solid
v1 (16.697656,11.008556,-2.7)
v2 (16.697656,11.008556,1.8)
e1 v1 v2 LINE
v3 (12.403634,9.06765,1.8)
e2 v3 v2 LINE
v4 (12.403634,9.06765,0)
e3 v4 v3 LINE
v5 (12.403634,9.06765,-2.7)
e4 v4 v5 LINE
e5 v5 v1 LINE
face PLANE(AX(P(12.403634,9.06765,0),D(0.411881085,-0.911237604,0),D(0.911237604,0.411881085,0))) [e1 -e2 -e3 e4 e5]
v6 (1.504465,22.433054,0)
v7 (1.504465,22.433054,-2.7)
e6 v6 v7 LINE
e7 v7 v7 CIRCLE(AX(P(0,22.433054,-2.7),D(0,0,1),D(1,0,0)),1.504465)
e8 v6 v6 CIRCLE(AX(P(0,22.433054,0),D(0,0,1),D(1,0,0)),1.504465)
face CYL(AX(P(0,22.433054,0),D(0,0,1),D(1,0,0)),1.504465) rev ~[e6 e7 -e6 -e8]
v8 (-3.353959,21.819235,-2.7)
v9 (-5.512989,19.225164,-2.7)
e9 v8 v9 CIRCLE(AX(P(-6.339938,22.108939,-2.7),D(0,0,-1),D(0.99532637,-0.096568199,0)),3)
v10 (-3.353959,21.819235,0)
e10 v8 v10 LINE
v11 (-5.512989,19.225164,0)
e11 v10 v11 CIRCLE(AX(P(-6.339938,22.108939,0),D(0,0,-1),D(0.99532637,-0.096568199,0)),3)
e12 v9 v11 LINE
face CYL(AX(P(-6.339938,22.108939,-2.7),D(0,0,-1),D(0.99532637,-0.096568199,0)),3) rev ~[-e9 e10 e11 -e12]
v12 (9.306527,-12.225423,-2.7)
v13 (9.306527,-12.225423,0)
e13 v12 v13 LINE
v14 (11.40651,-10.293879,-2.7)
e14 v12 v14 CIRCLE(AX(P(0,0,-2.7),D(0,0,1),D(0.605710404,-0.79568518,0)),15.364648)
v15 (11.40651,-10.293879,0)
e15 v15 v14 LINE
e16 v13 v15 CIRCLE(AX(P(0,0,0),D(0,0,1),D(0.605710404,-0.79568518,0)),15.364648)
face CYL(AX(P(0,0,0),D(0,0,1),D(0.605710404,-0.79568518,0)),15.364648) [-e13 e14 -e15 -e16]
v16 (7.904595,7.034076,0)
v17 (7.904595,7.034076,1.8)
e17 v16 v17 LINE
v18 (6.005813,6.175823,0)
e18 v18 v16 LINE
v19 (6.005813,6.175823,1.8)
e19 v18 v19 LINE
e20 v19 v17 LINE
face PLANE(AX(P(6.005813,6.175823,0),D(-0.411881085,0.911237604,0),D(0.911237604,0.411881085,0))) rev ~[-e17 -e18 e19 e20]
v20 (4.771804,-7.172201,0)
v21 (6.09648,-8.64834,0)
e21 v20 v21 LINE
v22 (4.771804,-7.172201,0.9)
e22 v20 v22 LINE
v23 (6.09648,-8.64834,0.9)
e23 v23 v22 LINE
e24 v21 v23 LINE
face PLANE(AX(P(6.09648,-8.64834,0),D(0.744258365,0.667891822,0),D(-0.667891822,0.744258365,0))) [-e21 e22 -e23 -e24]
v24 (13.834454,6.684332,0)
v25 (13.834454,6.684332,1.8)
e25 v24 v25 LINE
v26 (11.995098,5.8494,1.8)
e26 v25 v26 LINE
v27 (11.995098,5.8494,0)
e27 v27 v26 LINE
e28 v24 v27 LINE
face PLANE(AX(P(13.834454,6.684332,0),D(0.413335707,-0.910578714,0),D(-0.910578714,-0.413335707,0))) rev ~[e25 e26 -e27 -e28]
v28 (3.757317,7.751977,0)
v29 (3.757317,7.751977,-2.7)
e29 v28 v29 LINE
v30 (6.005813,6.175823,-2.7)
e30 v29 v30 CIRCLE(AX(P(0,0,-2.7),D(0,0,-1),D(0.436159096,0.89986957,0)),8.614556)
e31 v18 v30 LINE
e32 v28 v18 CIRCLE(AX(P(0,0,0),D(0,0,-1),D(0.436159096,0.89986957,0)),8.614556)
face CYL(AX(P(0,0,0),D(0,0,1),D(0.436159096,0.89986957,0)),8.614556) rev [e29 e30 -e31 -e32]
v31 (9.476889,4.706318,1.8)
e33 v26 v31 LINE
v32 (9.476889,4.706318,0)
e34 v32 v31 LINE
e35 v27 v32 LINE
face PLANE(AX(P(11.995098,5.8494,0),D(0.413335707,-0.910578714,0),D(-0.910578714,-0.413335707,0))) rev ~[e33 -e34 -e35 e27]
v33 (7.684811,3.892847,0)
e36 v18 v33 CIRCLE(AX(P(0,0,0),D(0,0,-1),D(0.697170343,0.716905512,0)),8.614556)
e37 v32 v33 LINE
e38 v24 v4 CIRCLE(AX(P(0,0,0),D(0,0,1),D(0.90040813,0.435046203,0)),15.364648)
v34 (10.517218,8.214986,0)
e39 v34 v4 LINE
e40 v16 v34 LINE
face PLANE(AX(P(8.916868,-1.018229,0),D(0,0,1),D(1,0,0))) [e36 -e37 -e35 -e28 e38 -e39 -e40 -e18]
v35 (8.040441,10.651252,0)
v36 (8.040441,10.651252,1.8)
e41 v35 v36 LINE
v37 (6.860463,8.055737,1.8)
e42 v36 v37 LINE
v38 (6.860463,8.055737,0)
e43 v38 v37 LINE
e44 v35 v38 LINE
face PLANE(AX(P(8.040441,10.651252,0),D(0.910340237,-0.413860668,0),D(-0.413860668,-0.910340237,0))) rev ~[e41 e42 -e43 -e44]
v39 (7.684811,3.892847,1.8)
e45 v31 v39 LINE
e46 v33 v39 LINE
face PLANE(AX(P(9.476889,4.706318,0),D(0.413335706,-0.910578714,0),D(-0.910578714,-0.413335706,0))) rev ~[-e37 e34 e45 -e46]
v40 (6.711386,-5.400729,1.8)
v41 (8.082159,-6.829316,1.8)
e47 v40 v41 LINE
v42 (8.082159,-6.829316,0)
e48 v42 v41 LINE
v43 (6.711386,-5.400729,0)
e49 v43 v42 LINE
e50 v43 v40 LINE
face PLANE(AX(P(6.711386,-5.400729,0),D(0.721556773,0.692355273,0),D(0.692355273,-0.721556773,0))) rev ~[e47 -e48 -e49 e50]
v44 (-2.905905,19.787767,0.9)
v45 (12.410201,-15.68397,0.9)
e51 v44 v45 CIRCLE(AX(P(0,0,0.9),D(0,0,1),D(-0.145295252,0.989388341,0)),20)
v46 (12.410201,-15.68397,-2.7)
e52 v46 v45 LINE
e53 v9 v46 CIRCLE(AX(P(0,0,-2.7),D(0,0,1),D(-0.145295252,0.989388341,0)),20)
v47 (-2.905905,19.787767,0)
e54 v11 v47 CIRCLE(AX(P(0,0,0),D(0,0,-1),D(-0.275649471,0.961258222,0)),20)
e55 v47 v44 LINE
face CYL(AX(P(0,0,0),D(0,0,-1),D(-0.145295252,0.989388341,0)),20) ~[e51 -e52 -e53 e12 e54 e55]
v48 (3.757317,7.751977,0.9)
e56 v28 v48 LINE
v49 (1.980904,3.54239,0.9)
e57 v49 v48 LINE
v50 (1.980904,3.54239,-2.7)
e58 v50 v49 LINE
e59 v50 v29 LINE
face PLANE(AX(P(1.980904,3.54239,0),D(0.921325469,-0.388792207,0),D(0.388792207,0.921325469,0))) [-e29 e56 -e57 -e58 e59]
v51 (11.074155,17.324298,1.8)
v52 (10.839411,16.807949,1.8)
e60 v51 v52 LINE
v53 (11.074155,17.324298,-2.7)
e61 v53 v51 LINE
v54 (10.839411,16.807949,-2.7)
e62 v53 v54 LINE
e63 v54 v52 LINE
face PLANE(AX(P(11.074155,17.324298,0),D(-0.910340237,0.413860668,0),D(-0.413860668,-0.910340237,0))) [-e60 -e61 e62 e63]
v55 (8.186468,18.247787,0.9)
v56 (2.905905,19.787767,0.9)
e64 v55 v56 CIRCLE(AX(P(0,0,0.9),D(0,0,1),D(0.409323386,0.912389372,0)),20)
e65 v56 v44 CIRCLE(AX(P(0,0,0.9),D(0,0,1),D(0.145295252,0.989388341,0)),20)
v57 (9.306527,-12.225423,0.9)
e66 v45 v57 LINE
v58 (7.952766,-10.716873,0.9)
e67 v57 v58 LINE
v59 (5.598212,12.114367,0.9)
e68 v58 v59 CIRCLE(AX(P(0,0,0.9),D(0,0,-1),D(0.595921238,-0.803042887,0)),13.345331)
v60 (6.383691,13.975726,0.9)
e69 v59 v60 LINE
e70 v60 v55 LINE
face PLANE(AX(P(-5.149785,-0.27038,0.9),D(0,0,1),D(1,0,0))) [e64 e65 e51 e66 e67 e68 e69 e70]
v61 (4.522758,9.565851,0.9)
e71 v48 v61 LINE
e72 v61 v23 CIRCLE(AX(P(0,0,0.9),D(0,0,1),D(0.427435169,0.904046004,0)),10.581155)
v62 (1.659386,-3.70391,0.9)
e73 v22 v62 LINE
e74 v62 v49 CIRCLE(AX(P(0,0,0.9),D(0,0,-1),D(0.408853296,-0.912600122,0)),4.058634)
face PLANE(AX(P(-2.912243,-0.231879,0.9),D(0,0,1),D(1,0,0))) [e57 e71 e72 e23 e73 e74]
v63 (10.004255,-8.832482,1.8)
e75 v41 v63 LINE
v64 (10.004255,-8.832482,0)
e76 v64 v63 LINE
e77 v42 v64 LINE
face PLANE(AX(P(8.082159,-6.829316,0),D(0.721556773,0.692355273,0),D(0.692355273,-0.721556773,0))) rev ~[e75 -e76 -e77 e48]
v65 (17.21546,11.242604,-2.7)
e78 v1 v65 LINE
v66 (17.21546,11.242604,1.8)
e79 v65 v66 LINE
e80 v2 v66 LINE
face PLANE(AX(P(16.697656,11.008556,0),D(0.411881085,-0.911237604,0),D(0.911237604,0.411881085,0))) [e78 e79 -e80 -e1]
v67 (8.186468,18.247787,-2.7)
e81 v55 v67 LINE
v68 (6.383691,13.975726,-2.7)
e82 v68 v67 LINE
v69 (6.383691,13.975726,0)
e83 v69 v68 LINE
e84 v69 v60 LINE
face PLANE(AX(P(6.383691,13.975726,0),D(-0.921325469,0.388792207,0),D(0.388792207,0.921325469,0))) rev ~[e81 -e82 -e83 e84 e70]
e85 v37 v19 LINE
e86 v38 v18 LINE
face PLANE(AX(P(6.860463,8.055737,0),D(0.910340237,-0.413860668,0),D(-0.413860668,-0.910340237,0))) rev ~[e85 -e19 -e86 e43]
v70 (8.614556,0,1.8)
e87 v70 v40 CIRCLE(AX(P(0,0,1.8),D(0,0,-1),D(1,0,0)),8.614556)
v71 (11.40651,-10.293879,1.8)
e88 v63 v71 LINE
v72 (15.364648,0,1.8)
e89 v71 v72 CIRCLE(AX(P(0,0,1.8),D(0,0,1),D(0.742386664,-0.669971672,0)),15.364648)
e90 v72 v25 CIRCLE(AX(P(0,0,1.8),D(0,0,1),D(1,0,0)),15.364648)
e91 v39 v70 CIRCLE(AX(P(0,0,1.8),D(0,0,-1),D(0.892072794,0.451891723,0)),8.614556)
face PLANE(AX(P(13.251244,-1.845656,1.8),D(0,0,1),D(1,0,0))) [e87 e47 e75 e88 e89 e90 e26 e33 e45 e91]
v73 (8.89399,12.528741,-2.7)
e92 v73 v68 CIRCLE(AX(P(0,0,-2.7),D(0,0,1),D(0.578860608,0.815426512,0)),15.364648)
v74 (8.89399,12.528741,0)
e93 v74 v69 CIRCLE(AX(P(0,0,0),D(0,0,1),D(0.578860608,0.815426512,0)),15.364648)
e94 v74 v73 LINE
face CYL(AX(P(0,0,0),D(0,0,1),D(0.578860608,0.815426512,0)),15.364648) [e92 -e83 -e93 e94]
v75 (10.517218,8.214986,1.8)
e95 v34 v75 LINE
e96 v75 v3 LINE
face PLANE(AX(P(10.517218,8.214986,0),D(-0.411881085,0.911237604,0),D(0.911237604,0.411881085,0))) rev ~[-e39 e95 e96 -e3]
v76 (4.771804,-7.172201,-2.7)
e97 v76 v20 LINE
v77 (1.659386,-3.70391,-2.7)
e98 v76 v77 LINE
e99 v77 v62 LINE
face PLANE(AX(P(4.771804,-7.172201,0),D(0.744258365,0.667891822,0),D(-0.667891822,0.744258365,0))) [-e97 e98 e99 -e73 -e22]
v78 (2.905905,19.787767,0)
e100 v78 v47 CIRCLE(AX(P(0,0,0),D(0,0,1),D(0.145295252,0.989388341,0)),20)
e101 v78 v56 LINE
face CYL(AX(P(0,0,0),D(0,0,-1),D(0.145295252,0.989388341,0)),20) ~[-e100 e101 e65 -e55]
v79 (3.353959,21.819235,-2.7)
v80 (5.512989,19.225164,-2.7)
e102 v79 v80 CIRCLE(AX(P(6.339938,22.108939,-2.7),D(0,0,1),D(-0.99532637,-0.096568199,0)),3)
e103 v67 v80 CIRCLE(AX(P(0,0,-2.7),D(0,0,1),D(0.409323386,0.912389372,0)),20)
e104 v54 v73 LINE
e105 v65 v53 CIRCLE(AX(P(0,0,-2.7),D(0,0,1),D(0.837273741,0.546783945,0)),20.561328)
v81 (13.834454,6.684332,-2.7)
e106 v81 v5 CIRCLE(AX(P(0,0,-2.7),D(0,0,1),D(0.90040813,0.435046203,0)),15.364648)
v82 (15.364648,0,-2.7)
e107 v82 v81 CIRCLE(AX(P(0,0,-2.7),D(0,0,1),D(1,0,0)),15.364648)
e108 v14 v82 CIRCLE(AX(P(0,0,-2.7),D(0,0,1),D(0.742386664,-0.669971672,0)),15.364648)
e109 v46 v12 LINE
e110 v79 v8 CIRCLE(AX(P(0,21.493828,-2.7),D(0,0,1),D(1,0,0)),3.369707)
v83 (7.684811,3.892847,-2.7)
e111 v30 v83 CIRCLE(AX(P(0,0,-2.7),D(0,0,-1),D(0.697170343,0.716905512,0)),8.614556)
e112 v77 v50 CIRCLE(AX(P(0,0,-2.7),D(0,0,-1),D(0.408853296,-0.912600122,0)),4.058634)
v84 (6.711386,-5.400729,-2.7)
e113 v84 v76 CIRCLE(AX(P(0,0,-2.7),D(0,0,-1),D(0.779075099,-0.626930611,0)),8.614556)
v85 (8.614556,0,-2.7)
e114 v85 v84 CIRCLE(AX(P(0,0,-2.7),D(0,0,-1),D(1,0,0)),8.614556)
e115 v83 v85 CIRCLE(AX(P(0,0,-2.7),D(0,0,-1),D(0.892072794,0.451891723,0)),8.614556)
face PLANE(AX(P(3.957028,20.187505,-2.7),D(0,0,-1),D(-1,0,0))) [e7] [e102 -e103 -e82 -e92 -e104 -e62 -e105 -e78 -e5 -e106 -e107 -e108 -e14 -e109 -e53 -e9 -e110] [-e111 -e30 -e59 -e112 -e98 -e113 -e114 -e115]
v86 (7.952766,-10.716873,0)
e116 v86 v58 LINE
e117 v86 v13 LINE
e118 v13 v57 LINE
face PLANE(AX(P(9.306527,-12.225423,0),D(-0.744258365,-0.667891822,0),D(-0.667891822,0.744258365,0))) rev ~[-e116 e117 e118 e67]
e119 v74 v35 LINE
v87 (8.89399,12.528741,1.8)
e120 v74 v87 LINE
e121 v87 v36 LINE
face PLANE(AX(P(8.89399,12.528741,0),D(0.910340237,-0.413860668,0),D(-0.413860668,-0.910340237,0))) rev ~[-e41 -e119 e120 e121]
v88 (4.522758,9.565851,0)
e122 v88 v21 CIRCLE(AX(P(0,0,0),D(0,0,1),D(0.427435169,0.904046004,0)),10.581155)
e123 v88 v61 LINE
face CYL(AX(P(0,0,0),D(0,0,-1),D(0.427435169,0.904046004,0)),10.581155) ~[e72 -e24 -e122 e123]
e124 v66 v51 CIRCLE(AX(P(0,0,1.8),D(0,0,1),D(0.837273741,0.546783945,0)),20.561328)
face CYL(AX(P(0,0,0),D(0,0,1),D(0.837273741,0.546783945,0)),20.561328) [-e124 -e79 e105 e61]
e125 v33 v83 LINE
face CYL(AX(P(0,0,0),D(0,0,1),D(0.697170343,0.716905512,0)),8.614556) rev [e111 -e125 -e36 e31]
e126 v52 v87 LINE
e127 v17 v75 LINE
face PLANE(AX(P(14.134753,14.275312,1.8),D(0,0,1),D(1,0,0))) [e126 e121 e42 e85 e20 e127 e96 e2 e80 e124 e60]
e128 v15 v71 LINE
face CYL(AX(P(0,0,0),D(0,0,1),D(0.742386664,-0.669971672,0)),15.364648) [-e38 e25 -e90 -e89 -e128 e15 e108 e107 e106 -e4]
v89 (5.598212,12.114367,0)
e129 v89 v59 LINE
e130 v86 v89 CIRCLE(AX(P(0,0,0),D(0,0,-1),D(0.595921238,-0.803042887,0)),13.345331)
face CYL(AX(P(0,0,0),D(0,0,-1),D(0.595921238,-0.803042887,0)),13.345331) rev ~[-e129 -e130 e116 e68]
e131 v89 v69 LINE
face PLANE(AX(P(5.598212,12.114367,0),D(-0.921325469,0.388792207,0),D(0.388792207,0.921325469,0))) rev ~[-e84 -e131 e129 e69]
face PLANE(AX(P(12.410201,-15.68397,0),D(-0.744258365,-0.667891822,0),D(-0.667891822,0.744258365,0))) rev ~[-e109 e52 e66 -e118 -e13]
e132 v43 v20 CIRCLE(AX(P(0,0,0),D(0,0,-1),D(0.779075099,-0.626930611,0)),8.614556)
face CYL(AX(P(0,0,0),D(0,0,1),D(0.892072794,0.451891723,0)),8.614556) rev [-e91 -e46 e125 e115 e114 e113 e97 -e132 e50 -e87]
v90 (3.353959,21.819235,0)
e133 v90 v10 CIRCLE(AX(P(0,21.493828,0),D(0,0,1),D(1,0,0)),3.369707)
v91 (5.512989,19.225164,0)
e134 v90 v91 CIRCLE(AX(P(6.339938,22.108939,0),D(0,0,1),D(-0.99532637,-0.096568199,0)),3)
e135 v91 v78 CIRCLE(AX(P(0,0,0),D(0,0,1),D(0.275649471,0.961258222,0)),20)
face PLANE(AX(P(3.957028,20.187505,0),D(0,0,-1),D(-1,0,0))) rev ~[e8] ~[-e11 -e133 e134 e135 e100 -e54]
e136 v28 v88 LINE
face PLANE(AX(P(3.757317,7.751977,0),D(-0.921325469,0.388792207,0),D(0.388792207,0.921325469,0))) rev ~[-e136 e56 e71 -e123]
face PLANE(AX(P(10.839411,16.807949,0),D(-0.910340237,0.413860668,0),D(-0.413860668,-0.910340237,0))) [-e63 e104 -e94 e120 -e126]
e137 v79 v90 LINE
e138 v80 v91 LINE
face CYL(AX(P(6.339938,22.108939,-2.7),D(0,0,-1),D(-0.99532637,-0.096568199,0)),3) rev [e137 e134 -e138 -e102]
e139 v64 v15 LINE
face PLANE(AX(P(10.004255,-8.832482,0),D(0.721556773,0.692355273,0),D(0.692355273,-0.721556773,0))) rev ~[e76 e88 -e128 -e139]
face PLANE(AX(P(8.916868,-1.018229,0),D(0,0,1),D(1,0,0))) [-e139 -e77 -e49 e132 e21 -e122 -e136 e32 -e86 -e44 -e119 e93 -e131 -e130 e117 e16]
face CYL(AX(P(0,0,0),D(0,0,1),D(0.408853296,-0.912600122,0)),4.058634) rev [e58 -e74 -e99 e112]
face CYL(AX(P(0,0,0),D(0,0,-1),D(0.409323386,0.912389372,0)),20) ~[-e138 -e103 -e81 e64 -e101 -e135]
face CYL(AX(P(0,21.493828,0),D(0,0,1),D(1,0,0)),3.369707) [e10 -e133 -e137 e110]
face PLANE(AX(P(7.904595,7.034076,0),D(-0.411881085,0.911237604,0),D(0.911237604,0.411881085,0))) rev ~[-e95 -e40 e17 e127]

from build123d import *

# Parameters (mm, degrees)
F0_R        = 1.5044645314
F1_DEPTH    = 2.7
F2_DEPTH    = 0.9
F3_DEPTH    = 2.7
F4_DEPTH    = 1.8
F5_T1_DEPTH = 2.7


# Not quite as in the source:
# - a fillet or chamfer that OpenCascade refuses, or shapes differently, is made with other operations: its cross-section is extruded or revolved along the edge and cut away or added


with BuildPart() as f1:
    # F0 (on Top) → F1 (new body)
    with BuildSketch(Plane.XY):
        with BuildLine():
            ThreePointArc((-2.9059050305, 19.7877668258), (-18.361479671, -7.928181651), (12.4102011034, -15.6839697964))
            Line((12.4102011034, -15.6839697964), (9.3065271924, -12.2254227754))
            ThreePointArc((9.3065271924, -12.2254227754), (-15.2699304913, -1.7034180964), (6.3836906961, 13.9757255095))
            Line((6.3836906961, 13.9757255095), (8.1864677167, 18.2477874364))
            ThreePointArc((8.1864677167, 18.2477874364), (5.5993809855, 19.2001805351), (2.9059050305, 19.7877668258))
            ThreePointArc((2.9059050305, 19.7877668258), (0, 18.1241204417), (-2.9059050305, 19.7877668258))
        make_face()
        with BuildLine():
            ThreePointArc((6.3836906961, 13.9757255095), (-15.2699304913, -1.7034180964), (9.3065271924, -12.2254227754))
            Line((9.3065271924, -12.2254227754), (7.9527661976, -10.7168731694))
            ThreePointArc((7.9527661976, -10.7168731694), (-13.2749249311, -1.3690247612), (5.5982117915, 12.114366903))
            Line((5.5982117915, 12.114366903), (6.3836906961, 13.9757255095))
        make_face()
        with BuildLine():
            ThreePointArc((5.5982117915, 12.114366903), (-13.2749249311, -1.3690247612), (7.9527661976, -10.7168731694))
            Line((7.9527661976, -10.7168731694), (6.0964799797, -8.6483397626))
            ThreePointArc((6.0964799797, -8.6483397626), (-10.5418803683, -0.9108276969), (4.5227579261, 9.5658512185))
            Line((4.5227579261, 9.5658512185), (5.5982117915, 12.114366903))
        make_face()
        with BuildLine():
            ThreePointArc((4.5227579261, 9.5658512185), (-10.5418803683, -0.9108276969), (6.0964799797, -8.6483397626))
            Line((6.0964799797, -8.6483397626), (4.7718042528, -7.1722010249))
            ThreePointArc((4.7718042528, -7.1722010249), (-8.5947223482, -0.5842355063), (3.7573171653, 7.7519772374))
            Line((3.7573171653, 7.7519772374), (4.5227579261, 9.5658512185))
        make_face()
        with BuildLine():
            ThreePointArc((3.7573171653, 7.7519772374), (-8.5947223482, -0.5842355063), (4.7718042528, -7.1722010249))
            Line((4.7718042528, -7.1722010249), (1.6593857385, -3.7039095455))
            ThreePointArc((1.6593857385, -3.7039095455), (-4.0546444127, 0.1799045205), (1.9809039535, 3.5423899386))
            Line((1.9809039535, 3.5423899386), (3.7573171653, 7.7519772374))
        make_face()
        with BuildLine():
            ThreePointArc((2.9059050305, 19.7877668258), (0, 20), (-2.9059050305, 19.7877668258))
            ThreePointArc((-2.9059050305, 19.7877668258), (0, 18.1241204417), (2.9059050305, 19.7877668258))
        make_face()
        with BuildLine():
            ThreePointArc((-3.157685128, 20.3174125427), (-3.043339046, 20.0471019762), (-2.9059050305, 19.7877668258))
            ThreePointArc((-2.9059050305, 19.7877668258), (0, 20), (2.9059050305, 19.7877668258))
            ThreePointArc((2.9059050305, 19.7877668258), (3.043339046, 20.0471019762), (3.157685128, 20.3174125427))
            ThreePointArc((3.157685128, 20.3174125427), (0, 20.5613284541), (-3.157685128, 20.3174125427))
        make_face()
        with BuildLine():
            ThreePointArc((3.3697074825, 21.4938279241), (-0.5976844127, 24.8101062388), (-3.157685128, 20.3174125427))
            ThreePointArc((-3.157685128, 20.3174125427), (0, 20.5613284541), (3.157685128, 20.3174125427))
            ThreePointArc((3.157685128, 20.3174125427), (3.3162783146, 20.8961435115), (3.3697074825, 21.4938279241))
        make_face()
        with Locations((0, 22.4330537021)):
            Circle(F0_R, mode=Mode.SUBTRACT)
        with BuildLine():
            ThreePointArc((13.8344540426, 6.6843318112), (13.1730545976, 7.9084159596), (12.4036340143, 9.0676498421))
            Line((12.4036340143, 9.0676498421), (10.5172175152, 8.21498609))
            ThreePointArc((10.5172175152, 8.21498609), (11.318131065, 7.0709101194), (11.995098321, 5.8493997121))
            Line((11.995098321, 5.8493997121), (13.8344540426, 6.6843318112))
        make_face()
        with BuildLine():
            ThreePointArc((11.995098321, 5.8493997121), (11.318131065, 7.0709101194), (10.5172175152, 8.21498609))
            Line((10.5172175152, 8.21498609), (7.9045951482, 7.0340759404))
            ThreePointArc((7.9045951482, 7.0340759404), (8.7683299388, 5.9226040621), (9.4768887451, 4.706317935))
            Line((9.4768887451, 4.706317935), (11.995098321, 5.8493997121))
        make_face()
        with BuildLine():
            ThreePointArc((9.4768887451, 4.706317935), (8.7683299388, 5.9226040621), (7.9045951482, 7.0340759404))
            Line((7.9045951482, 7.0340759404), (6.0058132946, 6.1758230253))
            ThreePointArc((6.0058132946, 6.1758230253), (6.9398340598, 5.1038501734), (7.6848114732, 3.8928467719))
            Line((7.6848114732, 3.8928467719), (9.4768887451, 4.706317935))
        make_face()
        with BuildLine():
            Line((6.0058132946, 6.1758230253), (7.9045951482, 7.0340759404))
            ThreePointArc((7.9045951482, 7.0340759404), (7.4001814409, 7.5629467428), (6.8604632985, 8.0557365971))
            Line((6.8604632985, 8.0557365971), (6.0058132946, 6.1758230253))
        make_face()
        with BuildLine():
            ThreePointArc((6.8604632985, 8.0557365971), (5.7414756731, 8.8879866049), (4.5227579261, 9.5658512185))
            Line((4.5227579261, 9.5658512185), (3.7573171653, 7.7519772374))
            ThreePointArc((3.7573171653, 7.7519772374), (4.9447694202, 7.0540654058), (6.0058132946, 6.1758230253))
            Line((6.0058132946, 6.1758230253), (6.8604632985, 8.0557365971))
        make_face()
        with BuildLine():
            ThreePointArc((8.0404414582, 10.6512516579), (6.8584540657, 11.4481207432), (5.5982117915, 12.114366903))
            Line((5.5982117915, 12.114366903), (4.5227579261, 9.5658512185))
            ThreePointArc((4.5227579261, 9.5658512185), (5.7414756731, 8.8879866049), (6.8604632985, 8.0557365971))
            Line((6.8604632985, 8.0557365971), (8.0404414582, 10.6512516579))
        make_face()
        with BuildLine():
            ThreePointArc((8.8939895289, 12.5287413845), (7.6730254156, 13.3115397829), (6.3836906961, 13.9757255095))
            Line((6.3836906961, 13.9757255095), (5.5982117915, 12.114366903))
            ThreePointArc((5.5982117915, 12.114366903), (6.8584540657, 11.4481207432), (8.0404414582, 10.6512516579))
            Line((8.0404414582, 10.6512516579), (8.8939895289, 12.5287413845))
        make_face()
        with BuildLine():
            Line((7.9045951482, 7.0340759404), (10.5172175152, 8.21498609))
            ThreePointArc((10.5172175152, 8.21498609), (9.3584466725, 9.514059943), (8.0404414582, 10.6512516579))
            Line((8.0404414582, 10.6512516579), (6.8604632985, 8.0557365971))
            ThreePointArc((6.8604632985, 8.0557365971), (7.4001814409, 7.5629467428), (7.9045951482, 7.0340759404))
        make_face()
        with BuildLine():
            Line((10.5172175152, 8.21498609), (12.4036340143, 9.0676498421))
            ThreePointArc((12.4036340143, 9.0676498421), (10.7885115198, 10.9398550999), (8.8939895289, 12.5287413845))
            Line((8.8939895289, 12.5287413845), (8.0404414582, 10.6512516579))
            ThreePointArc((8.0404414582, 10.6512516579), (9.3584466725, 9.514059943), (10.5172175152, 8.21498609))
        make_face()
        with BuildLine():
            Line((12.4036340143, 9.0676498421), (16.6976556484, 11.008555575))
            ThreePointArc((16.6976556484, 11.008555575), (14.070563524, 14.2133473227), (10.8394114429, 16.807949297))
            Line((10.8394114429, 16.807949297), (8.8939895289, 12.5287413845))
            ThreePointArc((8.8939895289, 12.5287413845), (10.7885115198, 10.9398550999), (12.4036340143, 9.0676498421))
        make_face()
        with BuildLine():
            ThreePointArc((10.8394114429, 16.807949297), (14.070563524, 14.2133473227), (16.6976556484, 11.008555575))
            Line((16.6976556484, 11.008555575), (17.2154603994, 11.2426042817))
            ThreePointArc((17.2154603994, 11.2426042817), (14.4679762691, 14.6097874889), (11.0741551061, 17.3242984413))
            Line((11.0741551061, 17.3242984413), (10.8394114429, 16.807949297))
        make_face()
    extrude(amount=-F1_DEPTH)

    # F0 (on Top) → F2 (join)
    with BuildSketch(Plane.XY):
        with BuildLine():
            ThreePointArc((-2.9059050305, 19.7877668258), (-18.361479671, -7.928181651), (12.4102011034, -15.6839697964))
            Line((12.4102011034, -15.6839697964), (9.3065271924, -12.2254227754))
            ThreePointArc((9.3065271924, -12.2254227754), (-15.2699304913, -1.7034180964), (6.3836906961, 13.9757255095))
            Line((6.3836906961, 13.9757255095), (8.1864677167, 18.2477874364))
            ThreePointArc((8.1864677167, 18.2477874364), (5.5993809855, 19.2001805351), (2.9059050305, 19.7877668258))
            ThreePointArc((2.9059050305, 19.7877668258), (0, 18.1241204417), (-2.9059050305, 19.7877668258))
        make_face()
        with BuildLine():
            ThreePointArc((6.3836906961, 13.9757255095), (-15.2699304913, -1.7034180964), (9.3065271924, -12.2254227754))
            Line((9.3065271924, -12.2254227754), (7.9527661976, -10.7168731694))
            ThreePointArc((7.9527661976, -10.7168731694), (-13.2749249311, -1.3690247612), (5.5982117915, 12.114366903))
            Line((5.5982117915, 12.114366903), (6.3836906961, 13.9757255095))
        make_face()
        with BuildLine():
            ThreePointArc((4.5227579261, 9.5658512185), (-10.5418803683, -0.9108276969), (6.0964799797, -8.6483397626))
            Line((6.0964799797, -8.6483397626), (4.7718042528, -7.1722010249))
            ThreePointArc((4.7718042528, -7.1722010249), (-8.5947223482, -0.5842355063), (3.7573171653, 7.7519772374))
            Line((3.7573171653, 7.7519772374), (4.5227579261, 9.5658512185))
        make_face()
        with BuildLine():
            ThreePointArc((3.7573171653, 7.7519772374), (-8.5947223482, -0.5842355063), (4.7718042528, -7.1722010249))
            Line((4.7718042528, -7.1722010249), (1.6593857385, -3.7039095455))
            ThreePointArc((1.6593857385, -3.7039095455), (-4.0546444127, 0.1799045205), (1.9809039535, 3.5423899386))
            Line((1.9809039535, 3.5423899386), (3.7573171653, 7.7519772374))
        make_face()
        with BuildLine():
            ThreePointArc((2.9059050305, 19.7877668258), (0, 20), (-2.9059050305, 19.7877668258))
            ThreePointArc((-2.9059050305, 19.7877668258), (0, 18.1241204417), (2.9059050305, 19.7877668258))
        make_face()
    extrude(amount=F2_DEPTH)

    # F0 (on Top) → F3 (join)
    with BuildSketch(Plane.XY):
        with BuildLine():
            Line((6.7113864418, -5.4007291543), (8.0821585416, -6.8293163715))
            ThreePointArc((8.0821585416, -6.8293163715), (9.9367857977, -3.6360881181), (10.5811553619, 0))
            ThreePointArc((10.5811553619, 0), (10.3013902205, 2.4170660555), (9.4768887451, 4.706317935))
            Line((9.4768887451, 4.706317935), (7.6848114732, 3.8928467719))
            ThreePointArc((7.6848114732, 3.8928467719), (8.3788968801, 2.00116727), (8.6145564813, 0))
            ThreePointArc((8.6145564813, 0), (8.1248446428, -2.8631246741), (6.7113864418, -5.4007291543))
        make_face()
        with BuildLine():
            Line((8.0821585416, -6.8293163715), (10.0042554899, -8.8324816906))
            ThreePointArc((10.0042554899, -8.8324816906), (12.4821464921, -4.721639511), (13.3453310458, 0))
            ThreePointArc((13.3453310458, 0), (13.0033922255, 3.0016081275), (11.995098321, 5.8493997121))
            Line((11.995098321, 5.8493997121), (9.4768887451, 4.706317935))
            ThreePointArc((9.4768887451, 4.706317935), (10.3013902205, 2.4170660555), (10.5811553619, 0))
            ThreePointArc((10.5811553619, 0), (9.9367857977, -3.6360881181), (8.0821585416, -6.8293163715))
        make_face()
        with BuildLine():
            Line((10.0042554899, -8.8324816906), (11.4065098197, -10.2938789654))
            ThreePointArc((11.4065098197, -10.2938789654), (14.3410149492, -5.5143177862), (15.3646480734, 0))
            ThreePointArc((15.3646480734, 0), (14.9772148291, 3.4286216448), (13.8344540426, 6.6843318112))
            Line((13.8344540426, 6.6843318112), (11.995098321, 5.8493997121))
            ThreePointArc((11.995098321, 5.8493997121), (13.0033922255, 3.0016081275), (13.3453310458, 0))
            ThreePointArc((13.3453310458, 0), (12.4821464921, -4.721639511), (10.0042554899, -8.8324816906))
        make_face()
        with BuildLine():
            Line((7.9527661976, -10.7168731694), (9.3065271924, -12.2254227754))
            ThreePointArc((9.3065271924, -12.2254227754), (10.4014513861, -11.3085020883), (11.4065098197, -10.2938789654))
            Line((11.4065098197, -10.2938789654), (10.0042554899, -8.8324816906))
            ThreePointArc((10.0042554899, -8.8324816906), (9.0278120152, -9.8283503672), (7.9527661976, -10.7168731694))
        make_face()
        with BuildLine():
            Line((6.0964799797, -8.6483397626), (7.9527661976, -10.7168731694))
            ThreePointArc((7.9527661976, -10.7168731694), (9.0278120152, -9.8283503672), (10.0042554899, -8.8324816906))
            Line((10.0042554899, -8.8324816906), (8.0821585416, -6.8293163715))
            ThreePointArc((8.0821585416, -6.8293163715), (7.1474232492, -7.8022554232), (6.0964799797, -8.6483397626))
        make_face()
        with BuildLine():
            Line((4.7718042528, -7.1722010249), (6.0964799797, -8.6483397626))
            ThreePointArc((6.0964799797, -8.6483397626), (7.1474232492, -7.8022554232), (8.0821585416, -6.8293163715))
            Line((8.0821585416, -6.8293163715), (6.7113864418, -5.4007291543))
            ThreePointArc((6.7113864418, -5.4007291543), (5.8095133427, -6.3608284122), (4.7718042528, -7.1722010249))
        make_face()
    extrude(amount=-F3_DEPTH)

    # F0 (on Top) → F4 (join)
    with BuildSketch(Plane.XY):
        with BuildLine():
            Line((10.0042554899, -8.8324816906), (11.4065098197, -10.2938789654))
            ThreePointArc((11.4065098197, -10.2938789654), (14.3410149492, -5.5143177862), (15.3646480734, 0))
            ThreePointArc((15.3646480734, 0), (14.9772148291, 3.4286216448), (13.8344540426, 6.6843318112))
            Line((13.8344540426, 6.6843318112), (11.995098321, 5.8493997121))
            ThreePointArc((11.995098321, 5.8493997121), (13.0033922255, 3.0016081275), (13.3453310458, 0))
            ThreePointArc((13.3453310458, 0), (12.4821464921, -4.721639511), (10.0042554899, -8.8324816906))
        make_face()
        with BuildLine():
            Line((8.0821585416, -6.8293163715), (10.0042554899, -8.8324816906))
            ThreePointArc((10.0042554899, -8.8324816906), (12.4821464921, -4.721639511), (13.3453310458, 0))
            ThreePointArc((13.3453310458, 0), (13.0033922255, 3.0016081275), (11.995098321, 5.8493997121))
            Line((11.995098321, 5.8493997121), (9.4768887451, 4.706317935))
            ThreePointArc((9.4768887451, 4.706317935), (10.3013902205, 2.4170660555), (10.5811553619, 0))
            ThreePointArc((10.5811553619, 0), (9.9367857977, -3.6360881181), (8.0821585416, -6.8293163715))
        make_face()
        with BuildLine():
            Line((6.7113864418, -5.4007291543), (8.0821585416, -6.8293163715))
            ThreePointArc((8.0821585416, -6.8293163715), (9.9367857977, -3.6360881181), (10.5811553619, 0))
            ThreePointArc((10.5811553619, 0), (10.3013902205, 2.4170660555), (9.4768887451, 4.706317935))
            Line((9.4768887451, 4.706317935), (7.6848114732, 3.8928467719))
            ThreePointArc((7.6848114732, 3.8928467719), (8.3788968801, 2.00116727), (8.6145564813, 0))
            ThreePointArc((8.6145564813, 0), (8.1248446428, -2.8631246741), (6.7113864418, -5.4007291543))
        make_face()
        with BuildLine():
            ThreePointArc((10.8394114429, 16.807949297), (14.070563524, 14.2133473227), (16.6976556484, 11.008555575))
            Line((16.6976556484, 11.008555575), (17.2154603994, 11.2426042817))
            ThreePointArc((17.2154603994, 11.2426042817), (14.4679762691, 14.6097874889), (11.0741551061, 17.3242984413))
            Line((11.0741551061, 17.3242984413), (10.8394114429, 16.807949297))
        make_face()
        with BuildLine():
            Line((6.0058132946, 6.1758230253), (7.9045951482, 7.0340759404))
            ThreePointArc((7.9045951482, 7.0340759404), (7.4001814409, 7.5629467428), (6.8604632985, 8.0557365971))
            Line((6.8604632985, 8.0557365971), (6.0058132946, 6.1758230253))
        make_face()
        with BuildLine():
            Line((7.9045951482, 7.0340759404), (10.5172175152, 8.21498609))
            ThreePointArc((10.5172175152, 8.21498609), (9.3584466725, 9.514059943), (8.0404414582, 10.6512516579))
            Line((8.0404414582, 10.6512516579), (6.8604632985, 8.0557365971))
            ThreePointArc((6.8604632985, 8.0557365971), (7.4001814409, 7.5629467428), (7.9045951482, 7.0340759404))
        make_face()
        with BuildLine():
            Line((10.5172175152, 8.21498609), (12.4036340143, 9.0676498421))
            ThreePointArc((12.4036340143, 9.0676498421), (10.7885115198, 10.9398550999), (8.8939895289, 12.5287413845))
            Line((8.8939895289, 12.5287413845), (8.0404414582, 10.6512516579))
            ThreePointArc((8.0404414582, 10.6512516579), (9.3584466725, 9.514059943), (10.5172175152, 8.21498609))
        make_face()
        with BuildLine():
            Line((12.4036340143, 9.0676498421), (16.6976556484, 11.008555575))
            ThreePointArc((16.6976556484, 11.008555575), (14.070563524, 14.2133473227), (10.8394114429, 16.807949297))
            Line((10.8394114429, 16.807949297), (8.8939895289, 12.5287413845))
            ThreePointArc((8.8939895289, 12.5287413845), (10.7885115198, 10.9398550999), (12.4036340143, 9.0676498421))
        make_face()
    extrude(amount=F4_DEPTH)

    # F5: fillet of radius 3 on 2 edges, made by hand

    # F5_s2 → F5_t1 (join)
    with BuildSketch(Plane.XY.offset(-2.7)):
        with BuildLine():
            ThreePointArc((3.3539587166, 21.8192345075), (4.0340965589, 20.1897997022), (5.5129894146, 19.2251644392))
            ThreePointArc((5.5129894146, 19.2251644392), (4.2188358916, 19.5499724736), (2.9059050305, 19.7877668258))
            ThreePointArc((2.9059050305, 19.7877668258), (3.2906213347, 20.768059539), (3.3539587166, 21.8192345075))
        make_face()
        with BuildLine():
            ThreePointArc((-3.3539587166, 21.8192345075), (-4.0340965589, 20.1897997022), (-5.5129894146, 19.2251644392))
            ThreePointArc((-5.5129894146, 19.2251644392), (-4.2188358916, 19.5499724736), (-2.9059050305, 19.7877668258))
            ThreePointArc((-2.9059050305, 19.7877668258), (-3.2906213347, 20.768059539), (-3.3539587166, 21.8192345075))
        make_face()
    extrude(amount=F5_T1_DEPTH)


solid = f1.part
